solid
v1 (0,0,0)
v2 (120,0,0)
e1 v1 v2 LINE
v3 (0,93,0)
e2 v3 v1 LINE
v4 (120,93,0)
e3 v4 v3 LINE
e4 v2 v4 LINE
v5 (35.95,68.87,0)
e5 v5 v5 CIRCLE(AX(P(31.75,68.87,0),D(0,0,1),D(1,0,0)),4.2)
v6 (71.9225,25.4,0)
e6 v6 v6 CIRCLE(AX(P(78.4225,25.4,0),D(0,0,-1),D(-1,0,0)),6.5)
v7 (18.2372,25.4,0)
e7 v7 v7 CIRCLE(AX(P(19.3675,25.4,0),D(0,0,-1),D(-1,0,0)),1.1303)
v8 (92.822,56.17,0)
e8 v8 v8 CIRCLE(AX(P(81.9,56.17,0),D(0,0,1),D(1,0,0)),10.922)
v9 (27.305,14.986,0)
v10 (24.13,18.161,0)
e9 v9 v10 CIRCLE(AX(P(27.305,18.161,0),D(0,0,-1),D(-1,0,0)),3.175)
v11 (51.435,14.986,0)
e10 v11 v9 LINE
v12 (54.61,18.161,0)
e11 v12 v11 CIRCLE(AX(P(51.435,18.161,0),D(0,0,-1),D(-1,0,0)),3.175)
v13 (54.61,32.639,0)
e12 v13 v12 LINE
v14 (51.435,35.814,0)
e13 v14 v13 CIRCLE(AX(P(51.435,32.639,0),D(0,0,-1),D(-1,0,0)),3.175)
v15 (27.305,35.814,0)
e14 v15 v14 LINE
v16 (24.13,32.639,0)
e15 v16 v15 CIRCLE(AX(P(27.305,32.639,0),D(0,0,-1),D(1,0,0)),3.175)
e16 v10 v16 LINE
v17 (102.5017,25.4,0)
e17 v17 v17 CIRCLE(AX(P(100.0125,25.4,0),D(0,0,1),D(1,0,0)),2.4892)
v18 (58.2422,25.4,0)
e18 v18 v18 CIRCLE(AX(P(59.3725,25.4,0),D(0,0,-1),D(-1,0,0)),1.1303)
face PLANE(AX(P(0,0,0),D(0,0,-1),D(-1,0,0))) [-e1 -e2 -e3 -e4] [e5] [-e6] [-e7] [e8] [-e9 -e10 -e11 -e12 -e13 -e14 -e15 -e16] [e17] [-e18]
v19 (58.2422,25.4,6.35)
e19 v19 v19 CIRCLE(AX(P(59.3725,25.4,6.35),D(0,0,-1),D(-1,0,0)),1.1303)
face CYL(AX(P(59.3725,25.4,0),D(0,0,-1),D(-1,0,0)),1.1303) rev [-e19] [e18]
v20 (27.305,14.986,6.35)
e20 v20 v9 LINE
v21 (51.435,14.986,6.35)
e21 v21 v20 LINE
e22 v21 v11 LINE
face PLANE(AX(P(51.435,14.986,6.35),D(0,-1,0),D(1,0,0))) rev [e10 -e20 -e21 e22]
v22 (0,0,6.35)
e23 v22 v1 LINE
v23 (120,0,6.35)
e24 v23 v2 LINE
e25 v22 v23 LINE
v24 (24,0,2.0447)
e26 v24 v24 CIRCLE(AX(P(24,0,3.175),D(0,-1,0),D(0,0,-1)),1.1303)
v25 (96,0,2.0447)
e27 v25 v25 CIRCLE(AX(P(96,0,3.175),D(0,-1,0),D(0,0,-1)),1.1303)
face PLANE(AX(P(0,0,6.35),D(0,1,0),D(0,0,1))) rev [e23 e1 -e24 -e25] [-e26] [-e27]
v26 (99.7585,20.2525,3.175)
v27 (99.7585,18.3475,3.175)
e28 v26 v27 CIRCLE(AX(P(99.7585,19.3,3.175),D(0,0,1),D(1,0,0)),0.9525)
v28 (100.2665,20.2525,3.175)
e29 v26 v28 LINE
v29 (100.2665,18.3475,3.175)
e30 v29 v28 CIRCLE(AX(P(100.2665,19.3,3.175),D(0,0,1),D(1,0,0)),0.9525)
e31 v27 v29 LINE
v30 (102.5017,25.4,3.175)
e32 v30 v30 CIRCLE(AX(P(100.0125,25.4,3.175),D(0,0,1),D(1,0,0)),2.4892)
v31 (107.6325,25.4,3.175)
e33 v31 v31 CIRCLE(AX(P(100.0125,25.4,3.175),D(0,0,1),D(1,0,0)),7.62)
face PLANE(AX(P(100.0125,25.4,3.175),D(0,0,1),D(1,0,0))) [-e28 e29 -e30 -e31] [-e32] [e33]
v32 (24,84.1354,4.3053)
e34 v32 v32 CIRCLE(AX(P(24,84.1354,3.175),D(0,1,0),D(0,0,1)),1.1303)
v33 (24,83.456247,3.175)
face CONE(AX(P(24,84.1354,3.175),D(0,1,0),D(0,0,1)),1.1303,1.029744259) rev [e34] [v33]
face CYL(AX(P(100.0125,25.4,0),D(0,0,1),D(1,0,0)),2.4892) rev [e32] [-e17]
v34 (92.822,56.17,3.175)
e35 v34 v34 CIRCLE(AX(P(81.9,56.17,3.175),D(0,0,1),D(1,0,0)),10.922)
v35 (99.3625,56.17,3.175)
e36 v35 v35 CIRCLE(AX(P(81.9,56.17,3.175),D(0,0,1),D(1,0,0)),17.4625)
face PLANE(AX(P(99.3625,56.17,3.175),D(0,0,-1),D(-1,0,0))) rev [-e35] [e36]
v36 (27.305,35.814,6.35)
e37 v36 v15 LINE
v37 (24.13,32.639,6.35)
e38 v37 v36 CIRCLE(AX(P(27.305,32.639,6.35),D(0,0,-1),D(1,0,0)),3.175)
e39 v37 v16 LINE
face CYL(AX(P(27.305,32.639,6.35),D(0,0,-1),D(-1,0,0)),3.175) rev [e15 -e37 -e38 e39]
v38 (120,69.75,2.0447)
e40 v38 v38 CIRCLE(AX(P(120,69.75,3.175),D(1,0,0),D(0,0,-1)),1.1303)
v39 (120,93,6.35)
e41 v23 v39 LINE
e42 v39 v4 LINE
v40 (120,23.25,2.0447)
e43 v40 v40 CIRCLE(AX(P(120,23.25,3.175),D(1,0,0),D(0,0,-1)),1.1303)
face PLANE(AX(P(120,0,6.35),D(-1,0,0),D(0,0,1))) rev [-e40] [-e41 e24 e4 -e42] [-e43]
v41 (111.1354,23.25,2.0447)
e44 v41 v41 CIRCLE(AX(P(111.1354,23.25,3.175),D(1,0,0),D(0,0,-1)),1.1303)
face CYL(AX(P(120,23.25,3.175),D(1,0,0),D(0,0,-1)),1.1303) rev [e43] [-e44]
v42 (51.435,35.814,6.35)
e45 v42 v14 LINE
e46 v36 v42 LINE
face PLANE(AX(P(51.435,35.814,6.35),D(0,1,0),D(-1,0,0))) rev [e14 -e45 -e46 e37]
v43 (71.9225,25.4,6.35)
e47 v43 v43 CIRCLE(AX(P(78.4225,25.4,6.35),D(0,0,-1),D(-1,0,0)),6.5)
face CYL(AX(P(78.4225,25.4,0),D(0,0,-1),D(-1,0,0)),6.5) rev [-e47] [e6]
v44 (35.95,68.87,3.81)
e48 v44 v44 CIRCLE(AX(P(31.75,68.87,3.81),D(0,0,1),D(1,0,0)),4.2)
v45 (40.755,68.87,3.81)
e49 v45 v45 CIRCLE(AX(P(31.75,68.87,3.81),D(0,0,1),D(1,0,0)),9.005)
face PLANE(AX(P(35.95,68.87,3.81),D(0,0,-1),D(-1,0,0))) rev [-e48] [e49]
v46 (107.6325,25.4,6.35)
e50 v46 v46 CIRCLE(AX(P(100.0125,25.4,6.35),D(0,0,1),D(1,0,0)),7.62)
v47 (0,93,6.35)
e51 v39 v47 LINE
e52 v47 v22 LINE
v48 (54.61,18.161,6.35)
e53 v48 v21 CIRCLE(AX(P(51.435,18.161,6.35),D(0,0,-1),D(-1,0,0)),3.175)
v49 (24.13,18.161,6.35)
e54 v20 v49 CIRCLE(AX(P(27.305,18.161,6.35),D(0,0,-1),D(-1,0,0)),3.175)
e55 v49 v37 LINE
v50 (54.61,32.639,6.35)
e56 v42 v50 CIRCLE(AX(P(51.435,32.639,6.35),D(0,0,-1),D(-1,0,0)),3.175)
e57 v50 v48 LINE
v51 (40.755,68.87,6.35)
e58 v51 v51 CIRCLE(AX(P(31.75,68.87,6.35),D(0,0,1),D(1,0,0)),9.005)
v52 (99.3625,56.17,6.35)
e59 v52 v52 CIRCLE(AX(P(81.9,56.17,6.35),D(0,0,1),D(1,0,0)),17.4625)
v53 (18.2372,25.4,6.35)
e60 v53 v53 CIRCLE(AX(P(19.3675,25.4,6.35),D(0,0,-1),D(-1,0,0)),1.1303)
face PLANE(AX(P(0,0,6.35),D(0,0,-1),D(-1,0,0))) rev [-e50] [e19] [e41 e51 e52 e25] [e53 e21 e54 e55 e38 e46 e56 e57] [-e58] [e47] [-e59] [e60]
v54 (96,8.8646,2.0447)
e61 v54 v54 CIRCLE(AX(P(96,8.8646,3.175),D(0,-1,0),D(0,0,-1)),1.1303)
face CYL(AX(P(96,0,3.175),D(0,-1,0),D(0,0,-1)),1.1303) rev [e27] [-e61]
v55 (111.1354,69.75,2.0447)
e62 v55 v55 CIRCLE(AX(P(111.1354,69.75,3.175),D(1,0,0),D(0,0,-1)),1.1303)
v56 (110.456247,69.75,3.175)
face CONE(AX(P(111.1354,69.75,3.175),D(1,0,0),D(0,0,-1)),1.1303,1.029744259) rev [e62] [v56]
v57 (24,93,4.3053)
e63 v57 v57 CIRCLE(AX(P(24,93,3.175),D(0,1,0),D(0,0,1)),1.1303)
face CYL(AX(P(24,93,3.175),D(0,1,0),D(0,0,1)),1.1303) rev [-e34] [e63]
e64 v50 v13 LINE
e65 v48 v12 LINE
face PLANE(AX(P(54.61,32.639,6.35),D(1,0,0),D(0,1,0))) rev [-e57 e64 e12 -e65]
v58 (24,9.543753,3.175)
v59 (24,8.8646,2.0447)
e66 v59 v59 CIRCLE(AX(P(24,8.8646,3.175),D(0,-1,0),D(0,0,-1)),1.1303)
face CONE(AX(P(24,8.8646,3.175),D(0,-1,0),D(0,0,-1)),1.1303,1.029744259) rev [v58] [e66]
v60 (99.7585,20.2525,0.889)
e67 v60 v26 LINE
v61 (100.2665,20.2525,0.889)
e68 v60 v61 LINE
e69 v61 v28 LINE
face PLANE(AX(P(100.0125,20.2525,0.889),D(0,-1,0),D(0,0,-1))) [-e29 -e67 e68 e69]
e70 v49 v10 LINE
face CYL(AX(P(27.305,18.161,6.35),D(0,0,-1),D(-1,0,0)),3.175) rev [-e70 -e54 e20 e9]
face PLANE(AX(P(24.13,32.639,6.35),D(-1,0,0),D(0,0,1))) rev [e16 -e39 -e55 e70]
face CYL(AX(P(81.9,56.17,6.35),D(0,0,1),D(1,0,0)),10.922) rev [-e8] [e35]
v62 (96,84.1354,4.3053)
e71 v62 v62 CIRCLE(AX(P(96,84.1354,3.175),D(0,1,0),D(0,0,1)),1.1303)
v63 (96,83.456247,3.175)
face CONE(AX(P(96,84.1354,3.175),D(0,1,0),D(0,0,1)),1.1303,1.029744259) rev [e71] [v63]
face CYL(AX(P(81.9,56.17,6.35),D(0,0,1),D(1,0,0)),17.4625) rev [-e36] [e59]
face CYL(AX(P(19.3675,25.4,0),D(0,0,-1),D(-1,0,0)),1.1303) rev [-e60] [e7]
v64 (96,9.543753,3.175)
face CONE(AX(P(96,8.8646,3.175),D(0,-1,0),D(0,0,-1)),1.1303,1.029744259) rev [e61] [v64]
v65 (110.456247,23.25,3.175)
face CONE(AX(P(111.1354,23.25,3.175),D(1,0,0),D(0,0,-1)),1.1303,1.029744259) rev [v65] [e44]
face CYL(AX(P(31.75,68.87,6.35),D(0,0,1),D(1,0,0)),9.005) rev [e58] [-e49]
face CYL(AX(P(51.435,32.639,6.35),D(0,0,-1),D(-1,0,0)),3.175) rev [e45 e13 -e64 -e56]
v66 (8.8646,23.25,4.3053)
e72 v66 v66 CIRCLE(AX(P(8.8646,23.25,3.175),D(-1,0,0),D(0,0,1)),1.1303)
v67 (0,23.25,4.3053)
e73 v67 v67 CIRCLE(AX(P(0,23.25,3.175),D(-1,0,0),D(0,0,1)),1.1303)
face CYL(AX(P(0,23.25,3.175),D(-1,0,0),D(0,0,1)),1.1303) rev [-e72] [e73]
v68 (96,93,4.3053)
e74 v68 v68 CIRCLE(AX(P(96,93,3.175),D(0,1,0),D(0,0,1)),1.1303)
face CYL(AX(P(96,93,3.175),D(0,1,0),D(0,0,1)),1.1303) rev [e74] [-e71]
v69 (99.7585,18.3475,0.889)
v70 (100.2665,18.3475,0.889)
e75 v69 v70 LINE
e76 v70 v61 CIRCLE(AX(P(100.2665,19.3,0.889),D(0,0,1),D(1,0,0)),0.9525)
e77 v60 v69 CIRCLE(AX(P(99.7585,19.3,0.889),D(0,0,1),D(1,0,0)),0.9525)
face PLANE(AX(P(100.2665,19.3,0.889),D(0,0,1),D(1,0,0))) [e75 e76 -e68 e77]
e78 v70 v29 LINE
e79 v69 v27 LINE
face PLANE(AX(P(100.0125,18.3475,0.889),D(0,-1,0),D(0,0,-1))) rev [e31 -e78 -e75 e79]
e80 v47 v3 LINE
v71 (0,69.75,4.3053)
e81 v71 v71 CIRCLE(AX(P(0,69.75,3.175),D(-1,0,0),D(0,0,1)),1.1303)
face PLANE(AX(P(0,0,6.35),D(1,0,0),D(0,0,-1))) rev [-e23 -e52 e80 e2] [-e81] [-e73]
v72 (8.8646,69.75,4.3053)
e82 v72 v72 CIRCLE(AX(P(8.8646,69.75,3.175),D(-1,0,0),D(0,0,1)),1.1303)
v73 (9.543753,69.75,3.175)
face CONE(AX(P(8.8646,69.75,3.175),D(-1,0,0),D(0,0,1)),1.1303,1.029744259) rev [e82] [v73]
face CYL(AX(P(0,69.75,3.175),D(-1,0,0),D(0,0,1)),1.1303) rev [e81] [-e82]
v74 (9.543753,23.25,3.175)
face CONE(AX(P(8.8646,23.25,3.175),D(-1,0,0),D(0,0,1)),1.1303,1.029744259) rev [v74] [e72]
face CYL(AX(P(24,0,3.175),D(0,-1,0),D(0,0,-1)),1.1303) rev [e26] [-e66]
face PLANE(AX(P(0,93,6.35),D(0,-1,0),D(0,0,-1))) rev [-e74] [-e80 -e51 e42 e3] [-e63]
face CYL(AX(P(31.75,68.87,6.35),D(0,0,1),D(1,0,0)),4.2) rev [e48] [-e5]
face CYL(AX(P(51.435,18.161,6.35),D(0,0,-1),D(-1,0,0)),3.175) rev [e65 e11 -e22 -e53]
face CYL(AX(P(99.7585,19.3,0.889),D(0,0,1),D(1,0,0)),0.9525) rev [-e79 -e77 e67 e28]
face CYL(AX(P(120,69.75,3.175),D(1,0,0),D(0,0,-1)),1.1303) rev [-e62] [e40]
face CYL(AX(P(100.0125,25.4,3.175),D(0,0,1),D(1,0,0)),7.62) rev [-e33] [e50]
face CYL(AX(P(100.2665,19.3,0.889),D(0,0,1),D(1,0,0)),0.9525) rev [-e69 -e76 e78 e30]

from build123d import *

# Parameters (mm, degrees)
SKETCH1_W                               = 120.00000003
SKETCH1_H                               = 92.999999928
BOSS_EXTRUDE1_DEPTH                     = 6.35
AC_INLET_DEPTH                          = 152.951711059
AC_INLET_SCREWS_D                       = 2.2606
FUSEHOLDER_D                            = 13
POWER_SWITCH_R                          = 7.62
POWER_SWITCH_INLAY_DEPTH                = 3.175
POWER_SWITCH_3_R                        = 2.4892
POWER_SWITCH_HOLE_DEPTH                 = 152.951711059
POWER_START                             = -3.175
POWER_SWITCH_LOCK_TAB_DEPTH             = 2.286
LED_PANEL_MOUNT_D                       = 8.0264
ADVANCEDHOLE1_START                     = 3.175
ADVANCEDHOLE1_OUTLINE_R                 = 17.4625
ADVANCEDHOLE1_DEPTH                     = 3.175
ADVANCEDHOLE1_2_OUTLINE_R               = 10.922
ADVANCEDHOLE1_2_DEPTH                   = 3.175
CBORE_FOR_M8_HEX_HEAD_BOLT2_D           = 8.4
CBORE_FOR_M8_HEX_HEAD_BOLT2_CBORE_D     = 18.01
CBORE_FOR_M8_HEX_HEAD_BOLT2_CBORE_DEPTH = 2.54
F_4_40_TAPPED_HOLE1_D                   = 2.2606
F_4_40_TAPPED_HOLE1_DEPTH               = 8.8646
F_4_40_TAPPED_HOLE1_TIP                 = 0.679152758
F_4_40_TAPPED_HOLE2_D                   = 2.2606
F_4_40_TAPPED_HOLE2_DEPTH               = 8.8646
F_4_40_TAPPED_HOLE2_TIP                 = 0.679152758
F_4_40_TAPPED_HOLE4_D                   = 2.2606
F_4_40_TAPPED_HOLE4_DEPTH               = 8.8646
F_4_40_TAPPED_HOLE4_TIP                 = 0.679152758


# Read off the part's stored shape, not the designer's step: AdvancedHole1, #4-40 Tapped Hole3
with BuildPart() as part:
    # Sketch1 → Boss-Extrude1 (new body)
    with BuildSketch(Plane.XY):
        with Locations((60.000000015, 46.499999964)):
            Rectangle(SKETCH1_W, SKETCH1_H)
    extrude(amount=BOSS_EXTRUDE1_DEPTH)

    # Sketch6 → AC Inlet (cut, through all)
    with BuildSketch(Plane(origin=(0, 0, 0), x_dir=(-1, 0, 0), z_dir=(0, 0, -1))):
        with BuildLine():
            Line((-51.435, 35.814), (-27.305, 35.814))
            ThreePointArc((-27.305, 35.814), (-25.05993597, 34.88406403), (-24.13, 32.639))
            Line((-24.13, 32.639), (-24.13, 18.161))
            ThreePointArc((-24.13, 18.161), (-25.05993597, 15.91593597), (-27.305, 14.986))
            Line((-27.305, 14.986), (-51.435, 14.986))
            ThreePointArc((-51.435, 14.986), (-53.68006403, 15.91593597), (-54.61, 18.161))
            Line((-54.61, 18.161), (-54.61, 32.639))
            ThreePointArc((-54.61, 32.639), (-53.68006403, 34.88406403), (-51.435, 35.814))
        make_face()
    extrude(amount=-AC_INLET_DEPTH, mode=Mode.SUBTRACT)

    # AC Inlet Screws (through all)
    with Locations(Plane(origin=(0, 0, 0), x_dir=(-1, 0, 0), z_dir=(0, 0, -1))):
        with Locations((-59.3725, 25.4), (-19.3675, 25.4)):
            Hole(AC_INLET_SCREWS_D / 2)

    # Fuseholder (through all)
    with Locations(Plane(origin=(0, 0, 0), x_dir=(-1, 0, 0), z_dir=(0, 0, -1))):
        with Locations((-78.4225, 25.4)):
            Hole(FUSEHOLDER_D / 2)

    # Power Switch → Power Switch Inlay (cut)
    with BuildSketch(Plane.XY.offset(6.35)):
        with Locations((100.0125, 25.4)):
            Circle(POWER_SWITCH_R)
    extrude(amount=-POWER_SWITCH_INLAY_DEPTH, mode=Mode.SUBTRACT)

    # Power Switch<3> → Power Switch Hole (cut, through all)
    with BuildSketch(Plane.XY.offset(6.35)):
        with Locations((100.0125, 25.4)):
            Circle(POWER_SWITCH_3_R)
    extrude(amount=-POWER_SWITCH_HOLE_DEPTH, mode=Mode.SUBTRACT)

    # Power Switch<4> → Power Switch Lock Tab (cut)
    with BuildSketch(Plane.XY.offset(6.35).offset(POWER_START)):
        with BuildLine():
            Line((99.7585, 20.2525), (100.2665, 20.2525))
            ThreePointArc((100.2665, 20.2525), (101.219, 19.3), (100.2665, 18.3475))
            Line((100.2665, 18.3475), (99.7585, 18.3475))
            ThreePointArc((99.7585, 18.3475), (98.806, 19.3), (99.7585, 20.2525))
        make_face()
    extrude(amount=-POWER_SWITCH_LOCK_TAB_DEPTH, mode=Mode.SUBTRACT)

    # LED Panel Mount (through all)
    with Locations(Plane(origin=(0, 0, 0), x_dir=(-1, 0, 0), z_dir=(0, 0, -1))):
        with Locations((-31.75, 68.869999928)):
            Hole(LED_PANEL_MOUNT_D / 2)

    # AdvancedHole1 outline → AdvancedHole1 (cut)
    with BuildSketch(Plane.XY.offset(ADVANCEDHOLE1_START)):
        with Locations((81.90000003, 56.169999928)):
            Circle(ADVANCEDHOLE1_OUTLINE_R)
    extrude(amount=ADVANCEDHOLE1_DEPTH, mode=Mode.SUBTRACT)

    # AdvancedHole1 2 outline → AdvancedHole1 2 (cut)
    with BuildSketch(Plane.XY):
        with Locations((81.90000003, 56.169999928)):
            Circle(ADVANCEDHOLE1_2_OUTLINE_R)
    extrude(amount=ADVANCEDHOLE1_2_DEPTH, mode=Mode.SUBTRACT)

    # CBORE for M8 Hex Head Bolt2 (through all)
    with Locations(Plane.XY.offset(6.35)):
        with Locations((31.75, 68.869999928)):
            CounterBoreHole(CBORE_FOR_M8_HEX_HEAD_BOLT2_D / 2, CBORE_FOR_M8_HEX_HEAD_BOLT2_CBORE_D / 2, CBORE_FOR_M8_HEX_HEAD_BOLT2_CBORE_DEPTH)

    # #4-40 Tapped Hole1
    with Locations(Plane(origin=(0, 0, 0), x_dir=(-1, 0, 0), z_dir=(0, -1, 0))):
        with Locations((-24.000000006, -3.175), (-96.000000024, -3.175)):
            Hole(F_4_40_TAPPED_HOLE1_D / 2, depth=F_4_40_TAPPED_HOLE1_DEPTH)
            with Locations((0, 0, -(F_4_40_TAPPED_HOLE1_DEPTH + F_4_40_TAPPED_HOLE1_TIP / 2))):  # 118° drill point
                Cone(0, F_4_40_TAPPED_HOLE1_D / 2, F_4_40_TAPPED_HOLE1_TIP, mode=Mode.SUBTRACT)

    # #4-40 Tapped Hole2
    with Locations(Plane(origin=(0, 92.999999928, 0), x_dir=(1, 0, 0), z_dir=(0, 1, 0))):
        with Locations((24.000000006, -3.175), (96.000000024, -3.175)):
            Hole(F_4_40_TAPPED_HOLE2_D / 2, depth=F_4_40_TAPPED_HOLE2_DEPTH)
            with Locations((0, 0, -(F_4_40_TAPPED_HOLE2_DEPTH + F_4_40_TAPPED_HOLE2_TIP / 2))):  # 118° drill point
                Cone(0, F_4_40_TAPPED_HOLE2_D / 2, F_4_40_TAPPED_HOLE2_TIP, mode=Mode.SUBTRACT)

    # #4-40 Tapped Hole3 outline → #4-40 Tapped Hole3 (revolve, cut)
    with BuildSketch(Plane(origin=(0, 23.249999982, 3.175), x_dir=(0, 1, 0), z_dir=(0, 0, -1))):
        Polygon((1.1303, 8.8646), (0, 9.543752758), (0, 0), (1.1303, 0), align=None)
    revolve(axis=Axis((0, 23.249999982, 3.175), (1, 0, 0)), mode=Mode.SUBTRACT)

    # 4-40 Tapped Hole3 2 outline → 4-40 Tapped Hole3 2 (revolve, cut)
    with BuildSketch(Plane(origin=(0, 69.749999946, 3.175), x_dir=(0, 1, 0), z_dir=(0, 0, -1))):
        Polygon((1.1303, 8.8646), (0, 9.543752758), (0, 0), (1.1303, 0), align=None)
    revolve(axis=Axis((0, 69.749999946, 3.175), (1, 0, 0)), mode=Mode.SUBTRACT)

    # #4-40 Tapped Hole4
    with Locations(Plane(origin=(120.00000003, 0, 0), x_dir=(0, 0, -1), z_dir=(1, 0, 0))):
        with Locations((-3.175, 69.749999946), (-3.175, 23.249999982)):
            Hole(F_4_40_TAPPED_HOLE4_D / 2, depth=F_4_40_TAPPED_HOLE4_DEPTH)
            with Locations((0, 0, -(F_4_40_TAPPED_HOLE4_DEPTH + F_4_40_TAPPED_HOLE4_TIP / 2))):  # 118° drill point
                Cone(0, F_4_40_TAPPED_HOLE4_D / 2, F_4_40_TAPPED_HOLE4_TIP, mode=Mode.SUBTRACT)


solid = part.part
